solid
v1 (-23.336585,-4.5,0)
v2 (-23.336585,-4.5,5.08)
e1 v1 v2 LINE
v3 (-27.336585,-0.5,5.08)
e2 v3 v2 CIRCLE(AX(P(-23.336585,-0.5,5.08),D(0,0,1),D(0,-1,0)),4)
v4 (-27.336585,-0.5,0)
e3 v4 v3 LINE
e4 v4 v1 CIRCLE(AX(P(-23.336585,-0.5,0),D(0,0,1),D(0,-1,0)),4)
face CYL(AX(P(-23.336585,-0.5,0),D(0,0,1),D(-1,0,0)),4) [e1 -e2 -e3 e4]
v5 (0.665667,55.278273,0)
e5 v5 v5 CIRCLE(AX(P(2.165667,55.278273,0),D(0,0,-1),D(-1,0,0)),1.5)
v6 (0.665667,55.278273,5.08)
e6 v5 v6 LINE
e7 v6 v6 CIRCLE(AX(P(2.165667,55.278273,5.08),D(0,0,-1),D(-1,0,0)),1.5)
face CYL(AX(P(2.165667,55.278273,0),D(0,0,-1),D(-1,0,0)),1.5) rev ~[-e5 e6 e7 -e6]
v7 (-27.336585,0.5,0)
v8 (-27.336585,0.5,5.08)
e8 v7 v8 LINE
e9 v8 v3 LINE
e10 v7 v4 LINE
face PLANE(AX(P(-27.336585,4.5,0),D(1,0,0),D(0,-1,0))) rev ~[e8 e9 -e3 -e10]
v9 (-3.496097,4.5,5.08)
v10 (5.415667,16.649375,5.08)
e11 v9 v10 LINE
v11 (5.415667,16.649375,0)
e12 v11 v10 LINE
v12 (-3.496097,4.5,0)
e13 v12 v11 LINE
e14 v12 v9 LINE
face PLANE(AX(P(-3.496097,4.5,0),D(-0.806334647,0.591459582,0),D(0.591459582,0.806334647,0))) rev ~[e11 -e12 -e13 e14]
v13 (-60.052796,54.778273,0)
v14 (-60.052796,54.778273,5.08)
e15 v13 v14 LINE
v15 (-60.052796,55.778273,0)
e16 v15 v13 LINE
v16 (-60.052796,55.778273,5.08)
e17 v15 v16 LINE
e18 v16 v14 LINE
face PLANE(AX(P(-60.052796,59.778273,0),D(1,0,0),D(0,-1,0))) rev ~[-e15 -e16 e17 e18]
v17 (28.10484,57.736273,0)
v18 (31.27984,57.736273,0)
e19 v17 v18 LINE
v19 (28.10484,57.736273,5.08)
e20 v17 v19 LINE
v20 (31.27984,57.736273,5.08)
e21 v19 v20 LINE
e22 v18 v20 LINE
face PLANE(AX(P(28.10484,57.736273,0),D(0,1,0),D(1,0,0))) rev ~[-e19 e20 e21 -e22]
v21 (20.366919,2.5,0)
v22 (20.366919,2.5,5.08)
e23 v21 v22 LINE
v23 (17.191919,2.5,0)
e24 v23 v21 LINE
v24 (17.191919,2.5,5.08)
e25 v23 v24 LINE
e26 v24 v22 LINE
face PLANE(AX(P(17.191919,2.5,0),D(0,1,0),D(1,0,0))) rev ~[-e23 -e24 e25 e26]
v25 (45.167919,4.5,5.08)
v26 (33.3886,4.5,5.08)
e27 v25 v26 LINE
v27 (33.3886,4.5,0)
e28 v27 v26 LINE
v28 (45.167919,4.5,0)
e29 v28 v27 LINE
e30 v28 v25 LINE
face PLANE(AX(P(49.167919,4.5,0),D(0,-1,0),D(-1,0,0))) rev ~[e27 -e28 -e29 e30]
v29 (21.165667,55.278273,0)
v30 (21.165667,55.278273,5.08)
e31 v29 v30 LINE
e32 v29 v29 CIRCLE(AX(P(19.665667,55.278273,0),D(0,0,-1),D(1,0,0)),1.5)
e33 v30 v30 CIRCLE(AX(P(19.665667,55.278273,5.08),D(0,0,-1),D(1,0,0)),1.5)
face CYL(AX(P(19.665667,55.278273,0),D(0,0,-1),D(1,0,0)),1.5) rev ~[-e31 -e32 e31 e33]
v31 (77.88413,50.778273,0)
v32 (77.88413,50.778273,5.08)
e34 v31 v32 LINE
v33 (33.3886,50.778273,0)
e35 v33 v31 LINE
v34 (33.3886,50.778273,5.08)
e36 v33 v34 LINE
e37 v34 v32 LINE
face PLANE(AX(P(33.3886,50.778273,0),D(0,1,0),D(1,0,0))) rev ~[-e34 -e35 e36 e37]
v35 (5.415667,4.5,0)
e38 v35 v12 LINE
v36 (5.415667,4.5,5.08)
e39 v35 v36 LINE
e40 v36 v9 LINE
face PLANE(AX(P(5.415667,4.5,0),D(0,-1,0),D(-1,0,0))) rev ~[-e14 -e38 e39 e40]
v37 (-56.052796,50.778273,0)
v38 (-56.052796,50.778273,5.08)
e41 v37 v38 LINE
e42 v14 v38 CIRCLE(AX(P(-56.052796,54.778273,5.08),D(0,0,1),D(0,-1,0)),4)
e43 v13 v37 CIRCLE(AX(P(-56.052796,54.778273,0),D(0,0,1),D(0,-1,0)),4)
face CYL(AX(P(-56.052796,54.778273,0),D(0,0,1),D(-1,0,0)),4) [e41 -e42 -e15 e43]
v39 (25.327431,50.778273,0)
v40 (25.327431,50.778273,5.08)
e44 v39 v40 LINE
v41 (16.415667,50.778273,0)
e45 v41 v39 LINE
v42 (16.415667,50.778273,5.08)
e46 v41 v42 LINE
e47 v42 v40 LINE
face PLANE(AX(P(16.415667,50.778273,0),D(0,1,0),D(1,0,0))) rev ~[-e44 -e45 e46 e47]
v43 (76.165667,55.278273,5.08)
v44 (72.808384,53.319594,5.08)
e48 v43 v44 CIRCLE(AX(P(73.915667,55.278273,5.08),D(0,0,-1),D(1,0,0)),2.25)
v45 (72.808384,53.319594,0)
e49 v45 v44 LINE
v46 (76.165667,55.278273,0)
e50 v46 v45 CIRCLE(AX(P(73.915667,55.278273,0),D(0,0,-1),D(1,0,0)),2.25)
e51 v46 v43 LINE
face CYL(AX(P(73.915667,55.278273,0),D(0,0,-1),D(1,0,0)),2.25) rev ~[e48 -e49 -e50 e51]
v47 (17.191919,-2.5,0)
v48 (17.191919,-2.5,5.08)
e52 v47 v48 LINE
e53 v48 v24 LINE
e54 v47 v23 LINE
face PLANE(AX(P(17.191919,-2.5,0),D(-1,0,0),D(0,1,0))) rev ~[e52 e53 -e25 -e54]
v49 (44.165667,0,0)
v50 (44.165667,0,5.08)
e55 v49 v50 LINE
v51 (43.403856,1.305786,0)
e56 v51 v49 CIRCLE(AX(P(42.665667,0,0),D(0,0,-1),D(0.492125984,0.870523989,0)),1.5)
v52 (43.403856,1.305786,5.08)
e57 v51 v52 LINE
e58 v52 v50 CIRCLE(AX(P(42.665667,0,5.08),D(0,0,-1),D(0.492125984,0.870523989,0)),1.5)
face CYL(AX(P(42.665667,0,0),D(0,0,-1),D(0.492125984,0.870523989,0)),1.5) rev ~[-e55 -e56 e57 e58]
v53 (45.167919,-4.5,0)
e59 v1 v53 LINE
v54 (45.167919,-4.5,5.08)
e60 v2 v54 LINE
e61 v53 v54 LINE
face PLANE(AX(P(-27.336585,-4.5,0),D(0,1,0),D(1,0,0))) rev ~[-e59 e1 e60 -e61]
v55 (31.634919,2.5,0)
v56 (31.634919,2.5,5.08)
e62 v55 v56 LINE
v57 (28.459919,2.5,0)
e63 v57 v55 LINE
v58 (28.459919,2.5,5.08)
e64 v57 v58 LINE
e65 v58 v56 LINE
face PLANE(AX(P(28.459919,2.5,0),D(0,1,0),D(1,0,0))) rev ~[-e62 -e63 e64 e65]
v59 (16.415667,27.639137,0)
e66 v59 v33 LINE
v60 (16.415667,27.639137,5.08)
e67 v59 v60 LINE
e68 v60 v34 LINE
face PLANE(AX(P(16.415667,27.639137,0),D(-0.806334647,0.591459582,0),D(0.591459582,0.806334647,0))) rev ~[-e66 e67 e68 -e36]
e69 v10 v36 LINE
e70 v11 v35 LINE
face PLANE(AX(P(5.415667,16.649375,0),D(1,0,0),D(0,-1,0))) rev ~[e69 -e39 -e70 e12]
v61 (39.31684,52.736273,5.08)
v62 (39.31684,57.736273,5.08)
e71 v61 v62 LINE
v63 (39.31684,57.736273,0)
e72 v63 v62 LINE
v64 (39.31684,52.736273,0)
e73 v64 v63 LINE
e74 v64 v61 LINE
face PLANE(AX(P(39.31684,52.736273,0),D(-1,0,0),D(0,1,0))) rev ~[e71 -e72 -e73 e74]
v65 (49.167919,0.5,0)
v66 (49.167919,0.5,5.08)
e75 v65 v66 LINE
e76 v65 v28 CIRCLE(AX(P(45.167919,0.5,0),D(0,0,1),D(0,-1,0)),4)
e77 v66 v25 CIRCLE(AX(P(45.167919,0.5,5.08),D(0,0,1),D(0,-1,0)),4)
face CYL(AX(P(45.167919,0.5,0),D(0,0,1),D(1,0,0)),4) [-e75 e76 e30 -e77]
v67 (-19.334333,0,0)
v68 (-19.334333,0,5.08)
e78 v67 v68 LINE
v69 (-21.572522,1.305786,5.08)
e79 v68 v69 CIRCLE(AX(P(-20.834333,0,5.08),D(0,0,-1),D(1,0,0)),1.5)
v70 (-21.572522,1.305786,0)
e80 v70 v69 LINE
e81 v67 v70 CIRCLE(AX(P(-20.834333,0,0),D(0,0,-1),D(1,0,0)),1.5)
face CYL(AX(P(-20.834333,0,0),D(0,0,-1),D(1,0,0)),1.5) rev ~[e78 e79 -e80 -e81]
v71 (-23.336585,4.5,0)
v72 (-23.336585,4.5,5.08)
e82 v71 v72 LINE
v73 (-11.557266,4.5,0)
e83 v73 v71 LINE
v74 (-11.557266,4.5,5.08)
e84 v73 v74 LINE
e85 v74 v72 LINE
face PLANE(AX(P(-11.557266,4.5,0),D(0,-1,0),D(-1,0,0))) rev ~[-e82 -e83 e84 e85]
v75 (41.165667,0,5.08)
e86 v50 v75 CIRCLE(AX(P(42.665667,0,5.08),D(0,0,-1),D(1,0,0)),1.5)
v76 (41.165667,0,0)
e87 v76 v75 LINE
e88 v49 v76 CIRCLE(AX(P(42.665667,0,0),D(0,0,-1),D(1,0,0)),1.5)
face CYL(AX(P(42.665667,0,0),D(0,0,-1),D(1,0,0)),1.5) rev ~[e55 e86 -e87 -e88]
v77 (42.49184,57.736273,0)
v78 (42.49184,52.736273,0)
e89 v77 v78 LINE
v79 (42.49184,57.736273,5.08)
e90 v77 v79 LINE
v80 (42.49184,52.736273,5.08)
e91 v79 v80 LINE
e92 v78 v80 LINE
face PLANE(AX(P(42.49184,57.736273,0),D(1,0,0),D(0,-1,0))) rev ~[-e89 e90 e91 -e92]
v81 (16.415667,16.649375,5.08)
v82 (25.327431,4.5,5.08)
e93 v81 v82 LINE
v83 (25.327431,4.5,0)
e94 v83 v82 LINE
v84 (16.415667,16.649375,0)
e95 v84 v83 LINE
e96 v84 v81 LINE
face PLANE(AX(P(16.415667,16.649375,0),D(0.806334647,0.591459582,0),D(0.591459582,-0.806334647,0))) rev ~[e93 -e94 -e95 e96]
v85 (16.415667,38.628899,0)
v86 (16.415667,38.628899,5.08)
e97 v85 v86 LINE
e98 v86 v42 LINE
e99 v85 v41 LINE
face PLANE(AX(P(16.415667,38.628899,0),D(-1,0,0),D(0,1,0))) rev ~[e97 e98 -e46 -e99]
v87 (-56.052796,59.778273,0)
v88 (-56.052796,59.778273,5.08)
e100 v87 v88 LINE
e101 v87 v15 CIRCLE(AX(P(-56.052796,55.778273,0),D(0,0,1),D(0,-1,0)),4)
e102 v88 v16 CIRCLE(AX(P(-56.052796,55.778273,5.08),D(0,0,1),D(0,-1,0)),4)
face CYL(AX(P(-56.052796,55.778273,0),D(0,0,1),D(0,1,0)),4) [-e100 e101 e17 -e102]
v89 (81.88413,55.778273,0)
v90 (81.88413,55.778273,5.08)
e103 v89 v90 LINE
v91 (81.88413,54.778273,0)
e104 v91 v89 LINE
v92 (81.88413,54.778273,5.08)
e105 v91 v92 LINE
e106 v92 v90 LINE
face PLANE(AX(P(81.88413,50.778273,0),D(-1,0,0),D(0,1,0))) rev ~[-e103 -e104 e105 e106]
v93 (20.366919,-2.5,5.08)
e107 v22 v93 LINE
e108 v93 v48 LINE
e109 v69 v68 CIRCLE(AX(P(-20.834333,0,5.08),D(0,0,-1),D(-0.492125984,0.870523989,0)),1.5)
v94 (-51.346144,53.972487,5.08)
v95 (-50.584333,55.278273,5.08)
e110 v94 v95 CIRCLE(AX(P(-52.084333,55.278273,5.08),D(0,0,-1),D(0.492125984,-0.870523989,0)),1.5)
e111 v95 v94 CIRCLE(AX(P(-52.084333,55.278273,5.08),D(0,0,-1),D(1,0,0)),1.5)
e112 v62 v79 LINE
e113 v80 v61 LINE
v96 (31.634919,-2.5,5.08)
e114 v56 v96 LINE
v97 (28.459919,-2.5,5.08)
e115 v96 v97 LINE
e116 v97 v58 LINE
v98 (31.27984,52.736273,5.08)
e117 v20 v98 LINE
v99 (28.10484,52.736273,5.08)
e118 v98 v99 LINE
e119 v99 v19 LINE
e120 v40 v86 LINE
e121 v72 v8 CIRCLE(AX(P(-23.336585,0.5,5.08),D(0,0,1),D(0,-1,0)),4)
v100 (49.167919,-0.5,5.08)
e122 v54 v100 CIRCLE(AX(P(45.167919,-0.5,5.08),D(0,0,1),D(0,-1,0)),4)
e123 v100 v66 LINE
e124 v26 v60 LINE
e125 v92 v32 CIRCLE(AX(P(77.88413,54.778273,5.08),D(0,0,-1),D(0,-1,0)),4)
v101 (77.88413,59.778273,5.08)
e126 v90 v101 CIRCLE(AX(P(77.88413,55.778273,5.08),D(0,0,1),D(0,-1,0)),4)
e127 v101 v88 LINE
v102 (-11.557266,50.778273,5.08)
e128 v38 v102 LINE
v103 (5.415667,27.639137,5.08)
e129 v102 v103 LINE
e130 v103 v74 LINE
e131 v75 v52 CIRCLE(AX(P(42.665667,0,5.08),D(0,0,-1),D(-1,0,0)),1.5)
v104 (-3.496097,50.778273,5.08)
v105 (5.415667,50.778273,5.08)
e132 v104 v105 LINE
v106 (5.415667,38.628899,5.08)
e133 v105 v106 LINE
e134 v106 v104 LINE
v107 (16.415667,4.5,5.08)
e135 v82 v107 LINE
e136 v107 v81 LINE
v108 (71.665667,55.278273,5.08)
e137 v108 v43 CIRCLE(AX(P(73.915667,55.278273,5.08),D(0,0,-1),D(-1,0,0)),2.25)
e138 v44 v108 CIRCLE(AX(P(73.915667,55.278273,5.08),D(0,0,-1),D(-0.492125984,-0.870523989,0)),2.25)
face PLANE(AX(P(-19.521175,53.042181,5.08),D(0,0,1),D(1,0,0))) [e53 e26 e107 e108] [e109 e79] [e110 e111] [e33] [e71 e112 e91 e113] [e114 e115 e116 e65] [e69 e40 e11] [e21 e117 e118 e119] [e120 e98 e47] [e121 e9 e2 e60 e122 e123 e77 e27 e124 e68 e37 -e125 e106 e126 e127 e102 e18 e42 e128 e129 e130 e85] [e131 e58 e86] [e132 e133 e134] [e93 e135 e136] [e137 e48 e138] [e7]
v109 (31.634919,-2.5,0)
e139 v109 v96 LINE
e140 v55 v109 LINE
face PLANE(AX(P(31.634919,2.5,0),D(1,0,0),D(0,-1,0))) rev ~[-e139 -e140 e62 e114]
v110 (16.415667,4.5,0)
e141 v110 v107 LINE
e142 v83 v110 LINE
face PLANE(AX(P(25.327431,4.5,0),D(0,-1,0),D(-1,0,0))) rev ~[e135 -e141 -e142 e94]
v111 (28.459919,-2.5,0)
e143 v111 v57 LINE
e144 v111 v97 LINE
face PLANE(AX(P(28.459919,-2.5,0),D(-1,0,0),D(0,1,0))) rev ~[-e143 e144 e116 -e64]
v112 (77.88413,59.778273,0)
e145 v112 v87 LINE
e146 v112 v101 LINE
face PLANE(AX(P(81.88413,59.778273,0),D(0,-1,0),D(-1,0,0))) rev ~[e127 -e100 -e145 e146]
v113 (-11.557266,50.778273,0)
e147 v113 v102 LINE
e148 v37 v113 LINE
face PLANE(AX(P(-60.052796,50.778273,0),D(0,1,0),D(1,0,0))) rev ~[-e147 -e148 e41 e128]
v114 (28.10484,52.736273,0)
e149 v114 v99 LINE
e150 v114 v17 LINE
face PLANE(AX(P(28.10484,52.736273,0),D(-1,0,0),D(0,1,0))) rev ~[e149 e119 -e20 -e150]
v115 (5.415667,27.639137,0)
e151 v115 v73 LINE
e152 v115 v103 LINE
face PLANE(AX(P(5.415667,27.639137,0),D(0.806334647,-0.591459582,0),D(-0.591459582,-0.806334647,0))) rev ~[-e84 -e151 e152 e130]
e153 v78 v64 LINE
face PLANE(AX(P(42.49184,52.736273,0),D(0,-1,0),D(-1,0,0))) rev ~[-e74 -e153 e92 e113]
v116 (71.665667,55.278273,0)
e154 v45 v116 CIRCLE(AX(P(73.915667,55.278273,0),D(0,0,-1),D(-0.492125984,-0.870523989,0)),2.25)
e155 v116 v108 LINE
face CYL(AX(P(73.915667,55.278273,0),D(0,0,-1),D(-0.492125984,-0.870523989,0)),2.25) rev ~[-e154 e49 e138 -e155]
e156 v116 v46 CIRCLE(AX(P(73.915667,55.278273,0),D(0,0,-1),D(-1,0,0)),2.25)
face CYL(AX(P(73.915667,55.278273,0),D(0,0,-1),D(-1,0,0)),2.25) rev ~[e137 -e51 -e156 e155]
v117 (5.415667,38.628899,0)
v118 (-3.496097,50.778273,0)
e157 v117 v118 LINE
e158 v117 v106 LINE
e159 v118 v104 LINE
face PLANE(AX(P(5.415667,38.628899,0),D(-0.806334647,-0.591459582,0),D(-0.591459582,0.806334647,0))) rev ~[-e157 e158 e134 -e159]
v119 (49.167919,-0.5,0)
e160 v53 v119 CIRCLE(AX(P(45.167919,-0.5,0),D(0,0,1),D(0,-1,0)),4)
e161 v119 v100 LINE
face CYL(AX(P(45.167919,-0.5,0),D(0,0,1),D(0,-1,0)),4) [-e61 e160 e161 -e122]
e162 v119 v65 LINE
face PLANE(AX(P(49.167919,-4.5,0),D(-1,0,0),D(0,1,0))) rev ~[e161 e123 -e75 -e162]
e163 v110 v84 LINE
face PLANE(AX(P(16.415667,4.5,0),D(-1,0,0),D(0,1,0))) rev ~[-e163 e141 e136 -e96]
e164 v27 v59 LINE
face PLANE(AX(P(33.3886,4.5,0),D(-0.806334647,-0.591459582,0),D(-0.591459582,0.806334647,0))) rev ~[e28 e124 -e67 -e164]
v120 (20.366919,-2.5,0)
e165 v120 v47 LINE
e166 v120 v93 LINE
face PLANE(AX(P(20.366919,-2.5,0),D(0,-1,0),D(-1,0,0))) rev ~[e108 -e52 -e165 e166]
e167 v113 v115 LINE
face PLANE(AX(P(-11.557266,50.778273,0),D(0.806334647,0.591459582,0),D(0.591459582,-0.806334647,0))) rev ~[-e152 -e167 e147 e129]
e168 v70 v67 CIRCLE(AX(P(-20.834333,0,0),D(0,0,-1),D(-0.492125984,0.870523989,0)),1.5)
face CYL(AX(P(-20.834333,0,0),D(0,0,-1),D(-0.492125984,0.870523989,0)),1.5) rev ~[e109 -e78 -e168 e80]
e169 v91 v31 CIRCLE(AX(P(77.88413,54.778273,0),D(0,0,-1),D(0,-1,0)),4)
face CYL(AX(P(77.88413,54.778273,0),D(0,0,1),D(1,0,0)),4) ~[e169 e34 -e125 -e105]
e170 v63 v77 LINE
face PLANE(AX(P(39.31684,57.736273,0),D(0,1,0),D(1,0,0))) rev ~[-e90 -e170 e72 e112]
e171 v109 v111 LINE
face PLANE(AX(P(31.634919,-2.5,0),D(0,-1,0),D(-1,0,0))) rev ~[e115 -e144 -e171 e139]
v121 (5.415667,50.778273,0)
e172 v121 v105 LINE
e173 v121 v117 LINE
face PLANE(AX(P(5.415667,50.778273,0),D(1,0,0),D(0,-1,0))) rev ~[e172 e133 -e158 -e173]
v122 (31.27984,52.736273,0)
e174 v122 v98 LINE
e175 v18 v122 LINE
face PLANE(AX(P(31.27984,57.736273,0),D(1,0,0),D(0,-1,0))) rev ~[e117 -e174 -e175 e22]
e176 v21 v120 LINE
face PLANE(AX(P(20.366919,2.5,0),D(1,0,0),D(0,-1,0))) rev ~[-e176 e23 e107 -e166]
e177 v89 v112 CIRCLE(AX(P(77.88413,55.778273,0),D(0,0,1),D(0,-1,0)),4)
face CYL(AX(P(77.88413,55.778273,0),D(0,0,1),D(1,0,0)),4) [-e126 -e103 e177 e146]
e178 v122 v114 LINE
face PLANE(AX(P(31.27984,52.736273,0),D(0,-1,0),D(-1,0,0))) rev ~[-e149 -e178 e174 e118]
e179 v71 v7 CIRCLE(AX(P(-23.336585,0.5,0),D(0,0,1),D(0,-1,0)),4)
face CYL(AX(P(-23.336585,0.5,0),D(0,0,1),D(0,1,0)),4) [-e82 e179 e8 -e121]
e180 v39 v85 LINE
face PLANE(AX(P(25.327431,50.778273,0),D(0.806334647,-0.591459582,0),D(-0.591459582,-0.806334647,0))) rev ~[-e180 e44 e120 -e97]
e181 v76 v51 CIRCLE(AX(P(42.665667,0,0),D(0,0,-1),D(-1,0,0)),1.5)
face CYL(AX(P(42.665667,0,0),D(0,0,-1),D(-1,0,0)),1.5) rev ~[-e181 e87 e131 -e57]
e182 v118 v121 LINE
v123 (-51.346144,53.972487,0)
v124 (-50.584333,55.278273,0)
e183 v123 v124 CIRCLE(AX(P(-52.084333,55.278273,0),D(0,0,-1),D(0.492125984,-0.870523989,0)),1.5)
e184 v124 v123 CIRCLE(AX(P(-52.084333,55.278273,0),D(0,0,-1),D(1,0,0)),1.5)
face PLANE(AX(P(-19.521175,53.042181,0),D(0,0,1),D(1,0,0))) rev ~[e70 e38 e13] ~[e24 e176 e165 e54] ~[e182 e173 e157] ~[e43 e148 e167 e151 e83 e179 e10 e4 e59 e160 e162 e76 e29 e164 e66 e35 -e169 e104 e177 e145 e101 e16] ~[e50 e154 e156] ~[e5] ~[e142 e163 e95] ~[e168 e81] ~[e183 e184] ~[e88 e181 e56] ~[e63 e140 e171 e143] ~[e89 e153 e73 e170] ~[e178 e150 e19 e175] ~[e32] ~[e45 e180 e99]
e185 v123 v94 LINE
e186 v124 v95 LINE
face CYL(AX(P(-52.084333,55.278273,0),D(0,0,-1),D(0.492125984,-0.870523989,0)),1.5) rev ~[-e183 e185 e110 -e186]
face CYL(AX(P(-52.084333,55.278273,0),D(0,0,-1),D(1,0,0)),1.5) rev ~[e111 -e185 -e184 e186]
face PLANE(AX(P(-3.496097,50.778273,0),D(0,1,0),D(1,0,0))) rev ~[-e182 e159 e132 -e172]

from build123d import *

# Parameters (mm, degrees)
F1_DEPTH = 5.08
F2_R     = 4


# Not quite as in the source:
# - a feature names something its author has since deleted; it is built from what else it names


with BuildPart() as f1:
    # F0 (on Top) → F1 (new body)
    with BuildSketch(Plane.XY):
        with BuildLine():
            Line((0.6656670719, 55.2782733088), (-50.5843329281, 55.2782733088))
            ThreePointArc((-50.5843329281, 55.2782733088), (-50.7887088575, 54.5223908657), (-51.3461439517, 53.9724873251))
            Line((-51.3461439517, 53.9724873251), (-49.5403858838, 50.7782733088))
            Line((-49.5403858838, 50.7782733088), (-11.5572661318, 50.7782733088))
            Line((-11.5572661318, 50.7782733088), (-3.4960969558, 50.7782733088))
            Line((-3.4960969558, 50.7782733088), (5.4156670719, 50.7782733088))
            Line((5.4156670719, 50.7782733088), (10.9156670719, 50.7782733088))
            Line((10.9156670719, 50.7782733088), (10.9156670719, 55.2782733088))
            Line((10.9156670719, 55.2782733088), (3.6656670719, 55.2782733088))
            ThreePointArc((3.6656670719, 55.2782733088), (2.1656670719, 53.7782733088), (0.6656670719, 55.2782733088))
        make_face()
        with BuildLine():
            Line((-11.5572661318, 4.5), (-23.3782799724, 4.5))
            Line((-23.3782799724, 4.5), (-21.5725219045, 1.3057859837))
            ThreePointArc((-21.5725219045, 1.3057859837), (-20.0784504851, 1.2956240706), (-19.3343329281, 0))
            Line((-19.3343329281, 0), (10.9156670719, 0))
            Line((10.9156670719, 0), (10.9156670719, 4.5))
            Line((10.9156670719, 4.5), (5.4156670719, 4.5))
            Line((5.4156670719, 4.5), (-3.4960969558, 4.5))
            Line((-3.4960969558, 4.5), (-11.5572661318, 4.5))
        make_face()
        with BuildLine():
            ThreePointArc((-51.3461439517, 53.9724873251), (-53.3799569987, 56.0341557518), (-50.5843329281, 55.2782733088))
            Line((-50.5843329281, 55.2782733088), (0.6656670719, 55.2782733088))
            ThreePointArc((0.6656670719, 55.2782733088), (2.1656670719, 56.7782733088), (3.6656670719, 55.2782733088))
            Line((3.6656670719, 55.2782733088), (10.9156670719, 55.2782733088))
            Line((10.9156670719, 55.2782733088), (18.1656670719, 55.2782733088))
            ThreePointArc((18.1656670719, 55.2782733088), (19.6656670719, 56.7782733088), (21.1656670719, 55.2782733088))
            Line((21.1656670719, 55.2782733088), (28.1048402488, 55.2782733088))
            Line((28.1048402488, 55.2782733088), (28.1048402488, 57.7362733088))
            Line((28.1048402488, 57.7362733088), (31.2798402488, 57.7362733088))
            Line((31.2798402488, 57.7362733088), (31.2798402488, 55.2782733088))
            Line((31.2798402488, 55.2782733088), (39.3168402488, 55.2782733088))
            Line((39.3168402488, 55.2782733088), (39.3168402488, 57.7362733088))
            Line((39.3168402488, 57.7362733088), (42.4918402488, 57.7362733088))
            Line((42.4918402488, 57.7362733088), (42.4918402488, 55.2782733088))
            Line((42.4918402488, 55.2782733088), (71.6656670719, 55.2782733088))
            ThreePointArc((71.6656670719, 55.2782733088), (73.9156670719, 57.5282733088), (76.1656670719, 55.2782733088))
            ThreePointArc((76.1656670719, 55.2782733088), (75.0494907365, 53.3348372029), (72.8083836073, 53.3195943333))
            Line((72.8083836073, 53.3195943333), (71.3717200276, 50.7782733088))
            Line((71.3717200276, 50.7782733088), (81.8841302488, 50.7782733088))
            Line((81.8841302488, 50.7782733088), (81.8841302488, 59.7782733088))
            Line((81.8841302488, 59.7782733088), (-60.052796105, 59.7782733088))
            Line((-60.052796105, 59.7782733088), (-60.052796105, 50.7782733088))
            Line((-60.052796105, 50.7782733088), (-49.5403858838, 50.7782733088))
            Line((-49.5403858838, 50.7782733088), (-51.3461439517, 53.9724873251))
        make_face()
        with BuildLine():
            Line((-21.5725219045, 1.3057859837), (-23.3782799724, 4.5))
            Line((-23.3782799724, 4.5), (-27.3365851734, 4.5))
            Line((-27.3365851734, 4.5), (-27.3365851734, -4.5))
            Line((-27.3365851734, -4.5), (49.1679193172, -4.5))
            Line((49.1679193172, -4.5), (49.1679193172, 4.5))
            Line((49.1679193172, 4.5), (45.2096141162, 4.5))
            Line((45.2096141162, 4.5), (43.4038560483, 1.3057859837))
            ThreePointArc((43.4038560483, 1.3057859837), (43.9612911425, 0.7558824431), (44.1656670719, 0))
            ThreePointArc((44.1656670719, 0), (42.6656670719, -1.5), (41.1656670719, 0))
            Line((41.1656670719, 0), (31.6349193172, 0))
            Line((31.6349193172, 0), (31.6349193172, -2.5))
            Line((31.6349193172, -2.5), (28.4599193172, -2.5))
            Line((28.4599193172, -2.5), (28.4599193172, 0))
            Line((28.4599193172, 0), (20.3669193172, 0))
            Line((20.3669193172, 0), (20.3669193172, -2.5))
            Line((20.3669193172, -2.5), (17.1919193172, -2.5))
            Line((17.1919193172, -2.5), (17.1919193172, 0))
            Line((17.1919193172, 0), (10.9156670719, 0))
            Line((10.9156670719, 0), (-19.3343329281, 0))
            ThreePointArc((-19.3343329281, 0), (-21.5902153712, -1.2956240706), (-21.5725219045, 1.3057859837))
        make_face()
        with BuildLine():
            Line((10.9156670719, 4.5), (10.9156670719, 0))
            Line((10.9156670719, 0), (17.1919193172, 0))
            Line((17.1919193172, 0), (17.1919193172, 2.5))
            Line((17.1919193172, 2.5), (20.3669193172, 2.5))
            Line((20.3669193172, 2.5), (20.3669193172, 0))
            Line((20.3669193172, 0), (28.4599193172, 0))
            Line((28.4599193172, 0), (28.4599193172, 2.5))
            Line((28.4599193172, 2.5), (31.6349193172, 2.5))
            Line((31.6349193172, 2.5), (31.6349193172, 0))
            Line((31.6349193172, 0), (41.1656670719, 0))
            ThreePointArc((41.1656670719, 0), (41.9097846288, 1.2956240706), (43.4038560483, 1.3057859837))
            Line((43.4038560483, 1.3057859837), (45.2096141162, 4.5))
            Line((45.2096141162, 4.5), (33.3886002756, 4.5))
            Line((33.3886002756, 4.5), (25.3274310996, 4.5))
            Line((25.3274310996, 4.5), (16.4156670719, 4.5))
            Line((16.4156670719, 4.5), (10.9156670719, 4.5))
        make_face()
        with BuildLine():
            Line((18.1656670719, 55.2782733088), (10.9156670719, 55.2782733088))
            Line((10.9156670719, 55.2782733088), (10.9156670719, 50.7782733088))
            Line((10.9156670719, 50.7782733088), (16.4156670719, 50.7782733088))
            Line((16.4156670719, 50.7782733088), (25.3274310996, 50.7782733088))
            Line((25.3274310996, 50.7782733088), (33.3886002756, 50.7782733088))
            Line((33.3886002756, 50.7782733088), (71.3717200276, 50.7782733088))
            Line((71.3717200276, 50.7782733088), (72.8083836073, 53.3195943333))
            ThreePointArc((72.8083836073, 53.3195943333), (71.972230966, 54.1444496442), (71.6656670719, 55.2782733088))
            Line((71.6656670719, 55.2782733088), (42.4918402488, 55.2782733088))
            Line((42.4918402488, 55.2782733088), (42.4918402488, 52.7362733088))
            Line((42.4918402488, 52.7362733088), (39.3168402488, 52.7362733088))
            Line((39.3168402488, 52.7362733088), (39.3168402488, 55.2782733088))
            Line((39.3168402488, 55.2782733088), (31.2798402488, 55.2782733088))
            Line((31.2798402488, 55.2782733088), (31.2798402488, 52.7362733088))
            Line((31.2798402488, 52.7362733088), (28.1048402488, 52.7362733088))
            Line((28.1048402488, 52.7362733088), (28.1048402488, 55.2782733088))
            Line((28.1048402488, 55.2782733088), (21.1656670719, 55.2782733088))
            ThreePointArc((21.1656670719, 55.2782733088), (19.6656670719, 53.7782733088), (18.1656670719, 55.2782733088))
        make_face()
        Polygon((5.4156670719, 38.6288985841), (5.4156670719, 27.6391366544), (10.9156670719, 27.6391366544), (10.9156670719, 50.7782733088), (5.4156670719, 50.7782733088), align=None)
        Polygon((10.9156670719, 27.6391366544), (5.4156670719, 27.6391366544), (5.4156670719, 16.6493747247), (5.4156670719, 4.5), (10.9156670719, 4.5), align=None)
        Polygon((16.4156670719, 50.7782733088), (10.9156670719, 50.7782733088), (10.9156670719, 27.6391366544), (16.4156670719, 27.6391366544), (16.4156670719, 38.6288985841), align=None)
        Polygon((16.4156670719, 27.6391366544), (10.9156670719, 27.6391366544), (10.9156670719, 4.5), (16.4156670719, 4.5), (16.4156670719, 16.6493747247), align=None)
        Polygon((-3.4960969558, 50.7782733088), (-11.5572661318, 50.7782733088), (5.4156670719, 27.6391366544), (5.4156670719, 38.6288985841), align=None)
        Polygon((5.4156670719, 27.6391366544), (-11.5572661318, 4.5), (-3.4960969558, 4.5), (5.4156670719, 16.6493747247), align=None)
        Polygon((33.3886002756, 4.5), (16.4156670719, 27.6391366544), (16.4156670719, 16.6493747247), (25.3274310996, 4.5), align=None)
        Polygon((16.4156670719, 38.6288985841), (16.4156670719, 27.6391366544), (33.3886002756, 50.7782733088), (25.3274310996, 50.7782733088), align=None)
    extrude(amount=F1_DEPTH)

    # F2
    f2_edges = [f1.edges().sort_by_distance(p)[0] for p in [
        (-60.052796, 59.778273, 2.54),
        (-60.052796, 50.778273, 2.54),
        (81.88413, 59.778273, 2.54),
        (81.88413, 50.778273, 2.54),
        (49.167919, 4.5, 2.54),
        (49.167919, -4.5, 2.54),
        (-27.336585, 4.5, 2.54),
        (-27.336585, -4.5, 2.54),
    ]]
    fillet(f2_edges, radius=F2_R)


solid = f1.part
